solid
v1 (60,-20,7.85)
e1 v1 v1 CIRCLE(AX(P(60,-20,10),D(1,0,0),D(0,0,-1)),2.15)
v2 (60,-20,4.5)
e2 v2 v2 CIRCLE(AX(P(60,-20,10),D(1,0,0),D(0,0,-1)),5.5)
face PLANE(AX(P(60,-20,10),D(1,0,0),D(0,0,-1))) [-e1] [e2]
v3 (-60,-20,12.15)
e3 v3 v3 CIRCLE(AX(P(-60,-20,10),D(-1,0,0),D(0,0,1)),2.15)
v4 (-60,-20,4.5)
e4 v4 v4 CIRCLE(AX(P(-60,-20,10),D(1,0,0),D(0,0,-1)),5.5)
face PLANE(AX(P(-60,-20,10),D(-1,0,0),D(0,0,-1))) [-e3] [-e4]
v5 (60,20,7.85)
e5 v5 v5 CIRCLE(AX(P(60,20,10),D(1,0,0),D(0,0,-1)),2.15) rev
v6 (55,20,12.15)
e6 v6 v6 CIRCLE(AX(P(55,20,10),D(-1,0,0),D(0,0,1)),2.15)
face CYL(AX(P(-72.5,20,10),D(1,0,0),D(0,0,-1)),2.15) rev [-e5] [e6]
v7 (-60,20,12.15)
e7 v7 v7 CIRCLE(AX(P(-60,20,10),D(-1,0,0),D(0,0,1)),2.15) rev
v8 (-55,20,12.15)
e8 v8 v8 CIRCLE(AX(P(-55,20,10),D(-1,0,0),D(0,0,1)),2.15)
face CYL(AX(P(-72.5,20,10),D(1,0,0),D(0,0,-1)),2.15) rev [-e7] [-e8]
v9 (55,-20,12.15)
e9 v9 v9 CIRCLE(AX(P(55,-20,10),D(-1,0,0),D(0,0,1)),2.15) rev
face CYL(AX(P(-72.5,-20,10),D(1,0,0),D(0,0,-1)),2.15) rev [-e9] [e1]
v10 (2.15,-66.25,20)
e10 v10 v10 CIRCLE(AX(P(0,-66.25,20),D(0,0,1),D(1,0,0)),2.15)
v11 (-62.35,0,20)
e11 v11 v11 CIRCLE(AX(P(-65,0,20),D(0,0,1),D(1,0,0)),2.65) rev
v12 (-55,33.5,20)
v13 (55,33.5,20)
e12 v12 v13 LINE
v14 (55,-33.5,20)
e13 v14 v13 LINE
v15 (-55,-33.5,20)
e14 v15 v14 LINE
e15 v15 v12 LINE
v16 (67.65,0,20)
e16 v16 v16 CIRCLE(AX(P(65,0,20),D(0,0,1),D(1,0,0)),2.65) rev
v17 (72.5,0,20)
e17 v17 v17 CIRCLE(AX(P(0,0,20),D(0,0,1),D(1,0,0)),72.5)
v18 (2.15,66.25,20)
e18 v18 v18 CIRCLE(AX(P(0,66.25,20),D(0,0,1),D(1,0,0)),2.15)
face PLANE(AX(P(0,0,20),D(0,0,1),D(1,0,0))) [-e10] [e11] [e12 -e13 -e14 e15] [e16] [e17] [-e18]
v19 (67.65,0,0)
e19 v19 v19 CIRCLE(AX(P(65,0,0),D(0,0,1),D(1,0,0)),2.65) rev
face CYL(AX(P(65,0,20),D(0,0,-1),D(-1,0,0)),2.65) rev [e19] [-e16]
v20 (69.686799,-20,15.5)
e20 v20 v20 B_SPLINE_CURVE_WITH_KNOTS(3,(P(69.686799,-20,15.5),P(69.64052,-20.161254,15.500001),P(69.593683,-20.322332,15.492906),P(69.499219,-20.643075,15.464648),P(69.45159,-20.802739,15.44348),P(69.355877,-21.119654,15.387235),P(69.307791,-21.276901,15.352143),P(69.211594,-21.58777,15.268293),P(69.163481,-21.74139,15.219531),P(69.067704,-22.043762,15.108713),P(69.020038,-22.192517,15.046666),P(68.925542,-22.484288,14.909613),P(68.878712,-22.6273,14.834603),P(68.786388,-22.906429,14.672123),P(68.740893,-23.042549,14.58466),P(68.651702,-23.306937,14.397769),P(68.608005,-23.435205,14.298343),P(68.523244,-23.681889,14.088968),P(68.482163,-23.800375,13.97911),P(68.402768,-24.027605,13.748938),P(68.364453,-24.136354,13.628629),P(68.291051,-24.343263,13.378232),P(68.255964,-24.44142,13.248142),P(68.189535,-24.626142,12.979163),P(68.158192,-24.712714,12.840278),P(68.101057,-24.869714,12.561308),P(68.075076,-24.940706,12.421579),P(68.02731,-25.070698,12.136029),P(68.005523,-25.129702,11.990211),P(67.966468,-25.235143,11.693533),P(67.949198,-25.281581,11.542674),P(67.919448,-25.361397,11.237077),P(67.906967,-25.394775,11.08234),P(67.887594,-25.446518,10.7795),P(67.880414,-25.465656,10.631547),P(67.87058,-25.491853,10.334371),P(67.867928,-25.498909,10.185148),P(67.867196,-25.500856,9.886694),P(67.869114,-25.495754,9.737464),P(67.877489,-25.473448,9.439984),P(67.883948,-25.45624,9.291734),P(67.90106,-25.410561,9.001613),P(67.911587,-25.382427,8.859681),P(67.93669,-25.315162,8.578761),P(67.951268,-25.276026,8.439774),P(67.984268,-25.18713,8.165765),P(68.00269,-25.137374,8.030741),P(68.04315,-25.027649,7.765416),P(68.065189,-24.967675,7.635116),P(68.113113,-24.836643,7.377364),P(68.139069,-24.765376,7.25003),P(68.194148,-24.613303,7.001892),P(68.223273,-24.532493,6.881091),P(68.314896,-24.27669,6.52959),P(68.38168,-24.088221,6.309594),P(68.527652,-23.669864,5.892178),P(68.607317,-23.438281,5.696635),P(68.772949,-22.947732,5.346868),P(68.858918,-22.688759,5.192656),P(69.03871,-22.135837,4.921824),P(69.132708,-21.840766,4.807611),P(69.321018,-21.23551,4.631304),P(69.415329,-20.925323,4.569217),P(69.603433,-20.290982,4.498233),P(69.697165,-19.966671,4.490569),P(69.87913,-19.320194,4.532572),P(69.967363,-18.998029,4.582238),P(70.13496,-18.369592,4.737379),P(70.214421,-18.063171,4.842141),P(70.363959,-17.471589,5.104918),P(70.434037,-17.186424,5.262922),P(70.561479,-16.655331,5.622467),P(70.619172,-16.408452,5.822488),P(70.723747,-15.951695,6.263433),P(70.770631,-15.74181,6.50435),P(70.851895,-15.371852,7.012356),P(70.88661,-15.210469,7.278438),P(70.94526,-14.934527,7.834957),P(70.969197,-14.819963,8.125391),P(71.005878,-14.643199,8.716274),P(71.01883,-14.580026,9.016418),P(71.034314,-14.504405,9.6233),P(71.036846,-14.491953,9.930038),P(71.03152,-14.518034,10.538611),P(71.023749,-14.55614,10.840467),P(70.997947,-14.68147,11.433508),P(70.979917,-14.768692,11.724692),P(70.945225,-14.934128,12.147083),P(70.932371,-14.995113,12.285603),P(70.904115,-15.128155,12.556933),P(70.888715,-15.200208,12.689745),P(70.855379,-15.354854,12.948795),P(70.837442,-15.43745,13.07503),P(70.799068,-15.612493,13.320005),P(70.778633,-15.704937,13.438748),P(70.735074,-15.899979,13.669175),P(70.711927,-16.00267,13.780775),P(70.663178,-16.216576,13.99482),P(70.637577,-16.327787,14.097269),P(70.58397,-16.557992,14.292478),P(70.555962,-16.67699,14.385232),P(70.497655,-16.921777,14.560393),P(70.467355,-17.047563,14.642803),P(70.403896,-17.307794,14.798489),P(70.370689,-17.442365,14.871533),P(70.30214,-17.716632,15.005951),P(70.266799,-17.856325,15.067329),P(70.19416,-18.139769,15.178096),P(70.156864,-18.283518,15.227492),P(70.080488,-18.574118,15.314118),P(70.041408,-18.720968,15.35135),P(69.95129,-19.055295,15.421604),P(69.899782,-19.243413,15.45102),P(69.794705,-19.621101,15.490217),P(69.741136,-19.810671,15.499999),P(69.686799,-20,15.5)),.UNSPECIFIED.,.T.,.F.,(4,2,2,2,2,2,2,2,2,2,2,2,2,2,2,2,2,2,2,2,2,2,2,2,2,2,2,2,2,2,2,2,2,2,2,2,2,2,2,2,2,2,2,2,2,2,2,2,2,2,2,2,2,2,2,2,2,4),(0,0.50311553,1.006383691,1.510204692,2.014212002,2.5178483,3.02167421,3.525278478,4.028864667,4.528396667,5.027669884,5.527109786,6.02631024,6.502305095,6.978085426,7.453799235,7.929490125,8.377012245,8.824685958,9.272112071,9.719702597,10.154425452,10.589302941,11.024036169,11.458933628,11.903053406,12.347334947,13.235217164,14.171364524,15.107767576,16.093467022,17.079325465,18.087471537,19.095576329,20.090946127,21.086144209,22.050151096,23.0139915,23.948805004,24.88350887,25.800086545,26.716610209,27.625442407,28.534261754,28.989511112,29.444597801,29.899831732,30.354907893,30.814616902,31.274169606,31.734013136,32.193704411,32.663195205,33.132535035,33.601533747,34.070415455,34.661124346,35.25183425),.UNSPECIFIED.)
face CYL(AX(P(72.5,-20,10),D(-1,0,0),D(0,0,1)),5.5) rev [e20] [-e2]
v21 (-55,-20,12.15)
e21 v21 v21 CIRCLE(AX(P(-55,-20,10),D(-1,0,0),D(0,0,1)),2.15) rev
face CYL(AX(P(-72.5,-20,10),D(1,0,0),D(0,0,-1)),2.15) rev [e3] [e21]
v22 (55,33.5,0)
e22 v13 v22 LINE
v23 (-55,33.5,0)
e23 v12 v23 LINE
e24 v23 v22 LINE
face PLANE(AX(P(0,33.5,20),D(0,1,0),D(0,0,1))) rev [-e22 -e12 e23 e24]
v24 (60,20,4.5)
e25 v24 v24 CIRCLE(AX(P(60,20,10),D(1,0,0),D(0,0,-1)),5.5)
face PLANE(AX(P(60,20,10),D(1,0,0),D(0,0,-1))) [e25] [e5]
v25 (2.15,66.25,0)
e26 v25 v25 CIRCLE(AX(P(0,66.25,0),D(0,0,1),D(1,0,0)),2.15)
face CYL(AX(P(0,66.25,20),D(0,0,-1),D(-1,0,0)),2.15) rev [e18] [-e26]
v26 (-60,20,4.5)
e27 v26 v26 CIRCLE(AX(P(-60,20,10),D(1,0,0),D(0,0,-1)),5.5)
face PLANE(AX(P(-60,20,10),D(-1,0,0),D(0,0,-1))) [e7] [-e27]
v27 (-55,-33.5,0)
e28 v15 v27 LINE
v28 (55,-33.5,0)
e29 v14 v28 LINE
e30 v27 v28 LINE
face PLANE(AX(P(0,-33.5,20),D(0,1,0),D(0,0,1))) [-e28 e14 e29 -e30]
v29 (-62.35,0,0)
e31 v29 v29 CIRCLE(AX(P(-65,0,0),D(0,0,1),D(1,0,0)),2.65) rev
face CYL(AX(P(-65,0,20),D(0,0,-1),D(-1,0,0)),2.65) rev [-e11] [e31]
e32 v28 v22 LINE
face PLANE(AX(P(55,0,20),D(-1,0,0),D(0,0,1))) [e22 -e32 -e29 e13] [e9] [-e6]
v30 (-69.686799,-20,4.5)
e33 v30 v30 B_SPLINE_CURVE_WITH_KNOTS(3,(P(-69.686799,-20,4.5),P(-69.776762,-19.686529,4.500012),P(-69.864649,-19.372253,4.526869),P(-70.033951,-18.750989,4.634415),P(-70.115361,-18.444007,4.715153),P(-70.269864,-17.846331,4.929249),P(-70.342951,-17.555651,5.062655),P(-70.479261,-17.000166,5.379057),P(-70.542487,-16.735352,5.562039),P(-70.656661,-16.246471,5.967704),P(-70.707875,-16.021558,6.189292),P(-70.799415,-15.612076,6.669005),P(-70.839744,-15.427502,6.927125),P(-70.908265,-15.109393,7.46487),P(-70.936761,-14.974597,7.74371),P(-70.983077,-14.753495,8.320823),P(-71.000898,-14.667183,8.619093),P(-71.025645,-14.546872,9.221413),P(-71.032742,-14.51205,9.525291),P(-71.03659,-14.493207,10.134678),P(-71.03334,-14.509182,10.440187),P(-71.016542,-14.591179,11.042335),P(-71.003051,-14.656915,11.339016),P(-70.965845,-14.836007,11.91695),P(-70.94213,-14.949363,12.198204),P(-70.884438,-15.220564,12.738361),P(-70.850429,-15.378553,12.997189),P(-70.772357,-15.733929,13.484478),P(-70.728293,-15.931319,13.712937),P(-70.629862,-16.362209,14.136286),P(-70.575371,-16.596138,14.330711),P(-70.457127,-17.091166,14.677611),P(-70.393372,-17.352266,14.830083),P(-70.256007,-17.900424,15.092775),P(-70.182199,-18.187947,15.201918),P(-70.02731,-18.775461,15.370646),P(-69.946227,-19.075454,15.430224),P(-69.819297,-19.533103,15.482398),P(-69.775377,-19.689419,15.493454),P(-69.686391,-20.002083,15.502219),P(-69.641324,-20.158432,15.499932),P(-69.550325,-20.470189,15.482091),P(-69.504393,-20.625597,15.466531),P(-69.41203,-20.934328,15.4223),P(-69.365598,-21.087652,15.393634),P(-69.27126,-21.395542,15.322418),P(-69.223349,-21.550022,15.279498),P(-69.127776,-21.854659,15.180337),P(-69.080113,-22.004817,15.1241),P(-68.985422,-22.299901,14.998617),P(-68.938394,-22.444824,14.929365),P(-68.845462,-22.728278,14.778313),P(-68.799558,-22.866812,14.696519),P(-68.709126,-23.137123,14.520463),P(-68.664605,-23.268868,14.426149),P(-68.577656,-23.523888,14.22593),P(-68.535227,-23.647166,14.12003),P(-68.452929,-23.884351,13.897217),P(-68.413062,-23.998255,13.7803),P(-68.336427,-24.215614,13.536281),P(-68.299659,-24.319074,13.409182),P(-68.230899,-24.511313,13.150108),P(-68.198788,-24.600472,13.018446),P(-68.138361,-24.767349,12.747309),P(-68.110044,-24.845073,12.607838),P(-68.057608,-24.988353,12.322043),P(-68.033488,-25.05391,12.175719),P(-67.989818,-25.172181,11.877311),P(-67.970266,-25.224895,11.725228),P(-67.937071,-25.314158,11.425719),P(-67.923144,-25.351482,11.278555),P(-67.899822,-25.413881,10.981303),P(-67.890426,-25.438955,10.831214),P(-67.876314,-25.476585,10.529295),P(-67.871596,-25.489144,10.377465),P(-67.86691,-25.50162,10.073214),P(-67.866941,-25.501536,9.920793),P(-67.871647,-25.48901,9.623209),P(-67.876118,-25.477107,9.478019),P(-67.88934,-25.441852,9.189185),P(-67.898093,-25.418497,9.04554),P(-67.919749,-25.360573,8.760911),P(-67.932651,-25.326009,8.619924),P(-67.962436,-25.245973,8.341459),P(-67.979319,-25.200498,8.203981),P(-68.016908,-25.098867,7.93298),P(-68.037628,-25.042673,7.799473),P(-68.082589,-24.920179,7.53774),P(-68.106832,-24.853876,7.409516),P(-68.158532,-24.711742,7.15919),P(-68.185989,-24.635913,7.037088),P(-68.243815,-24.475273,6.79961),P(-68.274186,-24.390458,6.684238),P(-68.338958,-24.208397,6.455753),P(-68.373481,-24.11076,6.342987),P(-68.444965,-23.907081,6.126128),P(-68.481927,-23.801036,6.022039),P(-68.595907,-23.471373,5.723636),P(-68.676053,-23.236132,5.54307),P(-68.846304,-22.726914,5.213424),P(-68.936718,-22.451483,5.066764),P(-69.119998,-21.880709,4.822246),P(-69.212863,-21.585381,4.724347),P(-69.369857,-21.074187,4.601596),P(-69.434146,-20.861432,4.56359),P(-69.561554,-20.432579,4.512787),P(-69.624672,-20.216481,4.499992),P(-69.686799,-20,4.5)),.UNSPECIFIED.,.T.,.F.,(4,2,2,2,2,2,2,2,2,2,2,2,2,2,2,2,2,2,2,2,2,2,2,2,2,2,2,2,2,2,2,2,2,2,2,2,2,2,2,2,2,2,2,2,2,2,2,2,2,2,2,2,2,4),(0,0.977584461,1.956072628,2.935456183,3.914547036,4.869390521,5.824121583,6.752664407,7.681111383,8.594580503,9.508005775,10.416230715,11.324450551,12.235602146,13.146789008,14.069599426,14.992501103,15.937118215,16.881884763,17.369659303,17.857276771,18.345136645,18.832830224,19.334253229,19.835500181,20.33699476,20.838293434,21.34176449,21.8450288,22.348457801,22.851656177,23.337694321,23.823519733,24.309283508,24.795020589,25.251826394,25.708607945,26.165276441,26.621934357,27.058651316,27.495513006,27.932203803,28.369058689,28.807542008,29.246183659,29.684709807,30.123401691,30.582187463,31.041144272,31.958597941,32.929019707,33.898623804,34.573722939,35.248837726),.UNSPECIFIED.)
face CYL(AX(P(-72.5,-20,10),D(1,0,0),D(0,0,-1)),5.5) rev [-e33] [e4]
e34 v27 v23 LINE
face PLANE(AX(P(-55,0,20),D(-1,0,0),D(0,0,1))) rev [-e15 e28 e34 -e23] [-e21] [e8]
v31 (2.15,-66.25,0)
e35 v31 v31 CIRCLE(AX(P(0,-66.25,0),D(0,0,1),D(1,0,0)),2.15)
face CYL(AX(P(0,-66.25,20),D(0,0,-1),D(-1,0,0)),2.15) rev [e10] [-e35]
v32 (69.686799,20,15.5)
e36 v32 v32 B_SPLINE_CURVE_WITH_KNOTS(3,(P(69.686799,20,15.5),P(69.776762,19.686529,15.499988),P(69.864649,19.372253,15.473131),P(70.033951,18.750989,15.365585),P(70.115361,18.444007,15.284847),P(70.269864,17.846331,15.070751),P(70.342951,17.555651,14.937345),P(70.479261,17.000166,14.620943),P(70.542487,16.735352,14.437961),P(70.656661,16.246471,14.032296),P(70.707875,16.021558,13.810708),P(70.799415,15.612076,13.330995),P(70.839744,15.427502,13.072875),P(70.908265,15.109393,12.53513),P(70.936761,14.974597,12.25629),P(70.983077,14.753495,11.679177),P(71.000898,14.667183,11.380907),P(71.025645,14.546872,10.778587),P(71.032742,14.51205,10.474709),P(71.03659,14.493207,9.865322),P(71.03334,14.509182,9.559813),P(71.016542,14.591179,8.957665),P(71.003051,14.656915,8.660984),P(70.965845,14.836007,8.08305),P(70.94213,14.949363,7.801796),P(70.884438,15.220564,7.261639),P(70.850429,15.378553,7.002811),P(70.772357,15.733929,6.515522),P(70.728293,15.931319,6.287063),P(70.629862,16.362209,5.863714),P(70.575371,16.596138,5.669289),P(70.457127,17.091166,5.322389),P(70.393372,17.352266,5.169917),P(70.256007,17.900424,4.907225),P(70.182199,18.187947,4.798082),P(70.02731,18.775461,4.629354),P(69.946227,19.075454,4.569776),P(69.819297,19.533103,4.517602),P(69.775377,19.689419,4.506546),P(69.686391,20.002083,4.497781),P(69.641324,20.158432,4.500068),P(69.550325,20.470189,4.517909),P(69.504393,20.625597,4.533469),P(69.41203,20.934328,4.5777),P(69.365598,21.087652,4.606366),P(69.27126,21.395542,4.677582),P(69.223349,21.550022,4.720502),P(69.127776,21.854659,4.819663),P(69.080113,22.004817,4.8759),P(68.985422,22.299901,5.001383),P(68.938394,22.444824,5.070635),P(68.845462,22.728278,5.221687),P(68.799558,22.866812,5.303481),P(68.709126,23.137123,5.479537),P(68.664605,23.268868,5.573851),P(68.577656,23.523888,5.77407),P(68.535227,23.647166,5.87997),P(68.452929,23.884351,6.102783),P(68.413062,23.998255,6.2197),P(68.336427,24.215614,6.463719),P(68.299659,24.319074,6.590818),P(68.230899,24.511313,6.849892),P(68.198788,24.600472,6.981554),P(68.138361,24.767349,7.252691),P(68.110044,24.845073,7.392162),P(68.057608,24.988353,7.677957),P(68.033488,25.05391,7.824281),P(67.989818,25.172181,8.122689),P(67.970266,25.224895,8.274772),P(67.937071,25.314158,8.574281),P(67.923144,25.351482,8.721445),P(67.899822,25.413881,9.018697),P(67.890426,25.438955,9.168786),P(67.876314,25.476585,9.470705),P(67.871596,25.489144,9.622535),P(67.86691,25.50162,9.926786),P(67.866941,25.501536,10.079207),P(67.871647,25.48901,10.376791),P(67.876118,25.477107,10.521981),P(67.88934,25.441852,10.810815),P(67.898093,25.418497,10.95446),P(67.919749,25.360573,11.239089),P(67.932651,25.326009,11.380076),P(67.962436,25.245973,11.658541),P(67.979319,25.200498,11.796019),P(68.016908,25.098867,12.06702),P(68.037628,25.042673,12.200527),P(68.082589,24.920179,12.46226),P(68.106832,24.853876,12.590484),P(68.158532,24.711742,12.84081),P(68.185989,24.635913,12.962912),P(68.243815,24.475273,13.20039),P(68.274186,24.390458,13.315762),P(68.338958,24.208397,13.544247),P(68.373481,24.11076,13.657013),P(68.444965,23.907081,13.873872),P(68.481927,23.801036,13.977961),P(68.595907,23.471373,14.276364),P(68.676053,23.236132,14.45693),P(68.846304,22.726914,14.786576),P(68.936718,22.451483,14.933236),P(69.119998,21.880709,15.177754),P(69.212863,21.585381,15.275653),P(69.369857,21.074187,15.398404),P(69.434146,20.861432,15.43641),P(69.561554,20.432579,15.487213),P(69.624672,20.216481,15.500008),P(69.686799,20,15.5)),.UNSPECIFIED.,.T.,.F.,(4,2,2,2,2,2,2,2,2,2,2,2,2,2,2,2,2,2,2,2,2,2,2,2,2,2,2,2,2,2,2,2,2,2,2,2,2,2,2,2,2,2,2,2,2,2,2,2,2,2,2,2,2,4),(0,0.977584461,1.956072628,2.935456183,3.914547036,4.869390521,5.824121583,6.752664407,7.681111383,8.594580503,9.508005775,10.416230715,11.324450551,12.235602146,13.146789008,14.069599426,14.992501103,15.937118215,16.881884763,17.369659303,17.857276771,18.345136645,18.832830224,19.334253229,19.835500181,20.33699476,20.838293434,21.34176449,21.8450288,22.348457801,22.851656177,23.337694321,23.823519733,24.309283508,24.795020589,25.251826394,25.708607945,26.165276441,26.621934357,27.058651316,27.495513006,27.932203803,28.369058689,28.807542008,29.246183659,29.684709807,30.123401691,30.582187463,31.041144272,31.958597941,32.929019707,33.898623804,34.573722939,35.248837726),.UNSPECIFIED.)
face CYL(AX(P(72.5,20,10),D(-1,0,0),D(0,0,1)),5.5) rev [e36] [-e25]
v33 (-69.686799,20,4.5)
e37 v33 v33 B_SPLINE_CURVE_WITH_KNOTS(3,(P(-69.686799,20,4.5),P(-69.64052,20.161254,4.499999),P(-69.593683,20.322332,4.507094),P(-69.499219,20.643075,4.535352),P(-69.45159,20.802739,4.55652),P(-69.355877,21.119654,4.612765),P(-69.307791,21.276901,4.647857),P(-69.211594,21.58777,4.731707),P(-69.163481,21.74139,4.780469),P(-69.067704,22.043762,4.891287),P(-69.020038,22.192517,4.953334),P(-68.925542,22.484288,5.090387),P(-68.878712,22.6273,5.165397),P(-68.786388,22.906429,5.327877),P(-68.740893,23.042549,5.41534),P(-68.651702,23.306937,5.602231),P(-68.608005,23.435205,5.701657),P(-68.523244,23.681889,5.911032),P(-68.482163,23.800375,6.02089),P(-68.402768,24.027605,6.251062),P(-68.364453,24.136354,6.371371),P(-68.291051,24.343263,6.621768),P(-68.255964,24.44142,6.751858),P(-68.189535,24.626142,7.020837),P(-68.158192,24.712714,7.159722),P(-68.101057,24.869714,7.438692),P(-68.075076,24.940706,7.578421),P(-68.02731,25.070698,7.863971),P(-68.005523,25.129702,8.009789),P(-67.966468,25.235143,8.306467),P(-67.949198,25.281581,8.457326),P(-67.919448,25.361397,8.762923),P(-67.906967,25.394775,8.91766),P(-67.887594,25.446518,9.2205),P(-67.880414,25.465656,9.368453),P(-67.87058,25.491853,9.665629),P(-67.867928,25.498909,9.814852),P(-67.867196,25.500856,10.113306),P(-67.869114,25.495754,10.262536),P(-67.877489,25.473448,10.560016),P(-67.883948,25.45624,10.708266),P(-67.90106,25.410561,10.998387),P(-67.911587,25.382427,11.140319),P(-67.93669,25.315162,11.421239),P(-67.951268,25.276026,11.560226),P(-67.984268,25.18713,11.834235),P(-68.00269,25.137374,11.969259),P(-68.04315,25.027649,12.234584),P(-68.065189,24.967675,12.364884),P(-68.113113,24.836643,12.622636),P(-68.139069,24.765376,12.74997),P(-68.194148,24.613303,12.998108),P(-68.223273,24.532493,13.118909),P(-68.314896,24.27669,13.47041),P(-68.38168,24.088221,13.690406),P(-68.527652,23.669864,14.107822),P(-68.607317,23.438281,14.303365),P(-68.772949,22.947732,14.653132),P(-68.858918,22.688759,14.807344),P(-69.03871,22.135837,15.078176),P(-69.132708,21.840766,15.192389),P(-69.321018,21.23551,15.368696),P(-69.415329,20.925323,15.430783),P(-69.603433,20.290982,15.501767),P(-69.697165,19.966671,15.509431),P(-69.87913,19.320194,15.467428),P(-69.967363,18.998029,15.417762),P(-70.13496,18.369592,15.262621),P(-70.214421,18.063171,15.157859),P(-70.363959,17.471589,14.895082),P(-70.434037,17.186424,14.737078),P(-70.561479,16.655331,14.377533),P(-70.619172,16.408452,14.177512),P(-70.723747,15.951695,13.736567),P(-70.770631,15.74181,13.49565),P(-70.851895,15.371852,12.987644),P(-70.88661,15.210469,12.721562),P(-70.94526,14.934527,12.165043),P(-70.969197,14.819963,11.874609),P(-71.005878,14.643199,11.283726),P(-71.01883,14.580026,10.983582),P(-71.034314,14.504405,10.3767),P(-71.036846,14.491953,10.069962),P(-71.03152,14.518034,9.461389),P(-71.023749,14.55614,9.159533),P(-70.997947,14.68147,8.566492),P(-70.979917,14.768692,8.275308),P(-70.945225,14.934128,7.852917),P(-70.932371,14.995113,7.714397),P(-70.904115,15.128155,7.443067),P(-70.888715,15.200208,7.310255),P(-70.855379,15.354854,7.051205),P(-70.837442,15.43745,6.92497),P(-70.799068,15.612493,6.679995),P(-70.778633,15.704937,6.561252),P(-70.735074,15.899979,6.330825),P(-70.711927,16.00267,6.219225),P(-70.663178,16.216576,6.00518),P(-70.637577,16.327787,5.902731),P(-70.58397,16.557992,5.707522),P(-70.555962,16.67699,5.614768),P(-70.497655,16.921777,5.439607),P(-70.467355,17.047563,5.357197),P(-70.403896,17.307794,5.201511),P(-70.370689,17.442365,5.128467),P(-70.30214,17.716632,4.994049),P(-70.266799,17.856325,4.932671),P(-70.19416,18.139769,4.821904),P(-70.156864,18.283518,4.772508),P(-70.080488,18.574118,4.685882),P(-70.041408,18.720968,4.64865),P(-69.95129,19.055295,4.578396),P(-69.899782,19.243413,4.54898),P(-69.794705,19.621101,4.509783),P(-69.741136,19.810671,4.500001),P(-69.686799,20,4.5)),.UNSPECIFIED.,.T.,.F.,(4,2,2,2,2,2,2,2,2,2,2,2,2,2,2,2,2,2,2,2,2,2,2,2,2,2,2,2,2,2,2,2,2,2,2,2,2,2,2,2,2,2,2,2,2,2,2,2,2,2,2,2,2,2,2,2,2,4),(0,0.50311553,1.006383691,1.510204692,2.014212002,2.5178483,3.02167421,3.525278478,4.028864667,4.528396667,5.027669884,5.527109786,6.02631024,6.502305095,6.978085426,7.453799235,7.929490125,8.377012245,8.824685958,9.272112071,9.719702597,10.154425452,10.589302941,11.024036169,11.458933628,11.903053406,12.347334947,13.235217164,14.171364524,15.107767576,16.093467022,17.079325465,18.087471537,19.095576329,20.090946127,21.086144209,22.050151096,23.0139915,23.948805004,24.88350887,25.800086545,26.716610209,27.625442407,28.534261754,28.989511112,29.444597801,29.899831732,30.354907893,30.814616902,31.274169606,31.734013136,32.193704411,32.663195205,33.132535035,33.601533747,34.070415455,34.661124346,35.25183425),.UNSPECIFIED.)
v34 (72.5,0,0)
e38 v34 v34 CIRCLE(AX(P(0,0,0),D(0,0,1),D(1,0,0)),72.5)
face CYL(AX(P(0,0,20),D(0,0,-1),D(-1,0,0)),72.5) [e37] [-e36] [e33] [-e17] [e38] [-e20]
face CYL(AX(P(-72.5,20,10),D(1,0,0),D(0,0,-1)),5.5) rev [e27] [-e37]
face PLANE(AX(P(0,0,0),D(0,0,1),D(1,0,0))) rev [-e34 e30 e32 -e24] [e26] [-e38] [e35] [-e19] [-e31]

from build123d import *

# Parameters (mm, degrees)
SKETCH_3_R               = 72.5
SKETCH_3_R_2             = 2.15
SKETCH_3_W               = 110
SKETCH_3_H               = 67
SKETCH_3_R_3             = 2.65
EXTRUDE_2_DEPTH          = 20
CUT_EXTRUDE_2_DEPTH      = 149.028713431
CUT_EXTRUDE_2_DEPTH_BACK = 149.028713431
SKETCH_5_R               = 2.15
SKETCH_6_R               = 5.5
CUT_EXTRUDE_4_DEPTH      = 153.35649


with BuildPart() as part:
    # 草图3 → 凸台-拉伸2 (new body)
    with BuildSketch(Plane.XY):
        Circle(SKETCH_3_R)
        with Locations((0, -66.25)):
            Circle(SKETCH_3_R_2, mode=Mode.SUBTRACT)
        Rectangle(SKETCH_3_W, SKETCH_3_H, mode=Mode.SUBTRACT)
        with Locations((0, 66.25)):
            Circle(SKETCH_3_R_2, mode=Mode.SUBTRACT)
        with Locations((65, 0)):
            Circle(SKETCH_3_R_3, mode=Mode.SUBTRACT)
        with Locations((-65, 0)):
            Circle(SKETCH_3_R_3, mode=Mode.SUBTRACT)
    extrude(amount=EXTRUDE_2_DEPTH)

    # 草图5 → 切除-拉伸2 (cut, two sides: drawn at the far end of the back side and taken through both)
    with BuildSketch(Plane(origin=(-55, 0, 0), x_dir=(0, 0, -1), z_dir=(1, 0, 0)).offset(-CUT_EXTRUDE_2_DEPTH_BACK)):
        with Locations((-10, 20)):
            Circle(SKETCH_5_R)
        with Locations((-10, -20)):
            Circle(SKETCH_5_R)
    extrude(amount=CUT_EXTRUDE_2_DEPTH + CUT_EXTRUDE_2_DEPTH_BACK, mode=Mode.SUBTRACT)

    # 草图6 → 切除-拉伸4 (cut, through all)
    with BuildSketch(Plane(origin=(60, 0, 0), x_dir=(0, 0, -1), z_dir=(1, 0, 0))):
        with Locations((-10, 20)):
            Circle(SKETCH_6_R)
        with Locations((-10, -20)):
            Circle(SKETCH_6_R)
    cut_extrude_4 = extrude(amount=CUT_EXTRUDE_4_DEPTH, mode=Mode.SUBTRACT)

    # 镜向1: 切除-拉伸4 across plane
    add(cut_extrude_4.mirror(Plane(origin=(0, 0, 0), x_dir=(0, 0, 1), z_dir=(1, 0, 0))), mode=Mode.SUBTRACT)


solid = part.part
